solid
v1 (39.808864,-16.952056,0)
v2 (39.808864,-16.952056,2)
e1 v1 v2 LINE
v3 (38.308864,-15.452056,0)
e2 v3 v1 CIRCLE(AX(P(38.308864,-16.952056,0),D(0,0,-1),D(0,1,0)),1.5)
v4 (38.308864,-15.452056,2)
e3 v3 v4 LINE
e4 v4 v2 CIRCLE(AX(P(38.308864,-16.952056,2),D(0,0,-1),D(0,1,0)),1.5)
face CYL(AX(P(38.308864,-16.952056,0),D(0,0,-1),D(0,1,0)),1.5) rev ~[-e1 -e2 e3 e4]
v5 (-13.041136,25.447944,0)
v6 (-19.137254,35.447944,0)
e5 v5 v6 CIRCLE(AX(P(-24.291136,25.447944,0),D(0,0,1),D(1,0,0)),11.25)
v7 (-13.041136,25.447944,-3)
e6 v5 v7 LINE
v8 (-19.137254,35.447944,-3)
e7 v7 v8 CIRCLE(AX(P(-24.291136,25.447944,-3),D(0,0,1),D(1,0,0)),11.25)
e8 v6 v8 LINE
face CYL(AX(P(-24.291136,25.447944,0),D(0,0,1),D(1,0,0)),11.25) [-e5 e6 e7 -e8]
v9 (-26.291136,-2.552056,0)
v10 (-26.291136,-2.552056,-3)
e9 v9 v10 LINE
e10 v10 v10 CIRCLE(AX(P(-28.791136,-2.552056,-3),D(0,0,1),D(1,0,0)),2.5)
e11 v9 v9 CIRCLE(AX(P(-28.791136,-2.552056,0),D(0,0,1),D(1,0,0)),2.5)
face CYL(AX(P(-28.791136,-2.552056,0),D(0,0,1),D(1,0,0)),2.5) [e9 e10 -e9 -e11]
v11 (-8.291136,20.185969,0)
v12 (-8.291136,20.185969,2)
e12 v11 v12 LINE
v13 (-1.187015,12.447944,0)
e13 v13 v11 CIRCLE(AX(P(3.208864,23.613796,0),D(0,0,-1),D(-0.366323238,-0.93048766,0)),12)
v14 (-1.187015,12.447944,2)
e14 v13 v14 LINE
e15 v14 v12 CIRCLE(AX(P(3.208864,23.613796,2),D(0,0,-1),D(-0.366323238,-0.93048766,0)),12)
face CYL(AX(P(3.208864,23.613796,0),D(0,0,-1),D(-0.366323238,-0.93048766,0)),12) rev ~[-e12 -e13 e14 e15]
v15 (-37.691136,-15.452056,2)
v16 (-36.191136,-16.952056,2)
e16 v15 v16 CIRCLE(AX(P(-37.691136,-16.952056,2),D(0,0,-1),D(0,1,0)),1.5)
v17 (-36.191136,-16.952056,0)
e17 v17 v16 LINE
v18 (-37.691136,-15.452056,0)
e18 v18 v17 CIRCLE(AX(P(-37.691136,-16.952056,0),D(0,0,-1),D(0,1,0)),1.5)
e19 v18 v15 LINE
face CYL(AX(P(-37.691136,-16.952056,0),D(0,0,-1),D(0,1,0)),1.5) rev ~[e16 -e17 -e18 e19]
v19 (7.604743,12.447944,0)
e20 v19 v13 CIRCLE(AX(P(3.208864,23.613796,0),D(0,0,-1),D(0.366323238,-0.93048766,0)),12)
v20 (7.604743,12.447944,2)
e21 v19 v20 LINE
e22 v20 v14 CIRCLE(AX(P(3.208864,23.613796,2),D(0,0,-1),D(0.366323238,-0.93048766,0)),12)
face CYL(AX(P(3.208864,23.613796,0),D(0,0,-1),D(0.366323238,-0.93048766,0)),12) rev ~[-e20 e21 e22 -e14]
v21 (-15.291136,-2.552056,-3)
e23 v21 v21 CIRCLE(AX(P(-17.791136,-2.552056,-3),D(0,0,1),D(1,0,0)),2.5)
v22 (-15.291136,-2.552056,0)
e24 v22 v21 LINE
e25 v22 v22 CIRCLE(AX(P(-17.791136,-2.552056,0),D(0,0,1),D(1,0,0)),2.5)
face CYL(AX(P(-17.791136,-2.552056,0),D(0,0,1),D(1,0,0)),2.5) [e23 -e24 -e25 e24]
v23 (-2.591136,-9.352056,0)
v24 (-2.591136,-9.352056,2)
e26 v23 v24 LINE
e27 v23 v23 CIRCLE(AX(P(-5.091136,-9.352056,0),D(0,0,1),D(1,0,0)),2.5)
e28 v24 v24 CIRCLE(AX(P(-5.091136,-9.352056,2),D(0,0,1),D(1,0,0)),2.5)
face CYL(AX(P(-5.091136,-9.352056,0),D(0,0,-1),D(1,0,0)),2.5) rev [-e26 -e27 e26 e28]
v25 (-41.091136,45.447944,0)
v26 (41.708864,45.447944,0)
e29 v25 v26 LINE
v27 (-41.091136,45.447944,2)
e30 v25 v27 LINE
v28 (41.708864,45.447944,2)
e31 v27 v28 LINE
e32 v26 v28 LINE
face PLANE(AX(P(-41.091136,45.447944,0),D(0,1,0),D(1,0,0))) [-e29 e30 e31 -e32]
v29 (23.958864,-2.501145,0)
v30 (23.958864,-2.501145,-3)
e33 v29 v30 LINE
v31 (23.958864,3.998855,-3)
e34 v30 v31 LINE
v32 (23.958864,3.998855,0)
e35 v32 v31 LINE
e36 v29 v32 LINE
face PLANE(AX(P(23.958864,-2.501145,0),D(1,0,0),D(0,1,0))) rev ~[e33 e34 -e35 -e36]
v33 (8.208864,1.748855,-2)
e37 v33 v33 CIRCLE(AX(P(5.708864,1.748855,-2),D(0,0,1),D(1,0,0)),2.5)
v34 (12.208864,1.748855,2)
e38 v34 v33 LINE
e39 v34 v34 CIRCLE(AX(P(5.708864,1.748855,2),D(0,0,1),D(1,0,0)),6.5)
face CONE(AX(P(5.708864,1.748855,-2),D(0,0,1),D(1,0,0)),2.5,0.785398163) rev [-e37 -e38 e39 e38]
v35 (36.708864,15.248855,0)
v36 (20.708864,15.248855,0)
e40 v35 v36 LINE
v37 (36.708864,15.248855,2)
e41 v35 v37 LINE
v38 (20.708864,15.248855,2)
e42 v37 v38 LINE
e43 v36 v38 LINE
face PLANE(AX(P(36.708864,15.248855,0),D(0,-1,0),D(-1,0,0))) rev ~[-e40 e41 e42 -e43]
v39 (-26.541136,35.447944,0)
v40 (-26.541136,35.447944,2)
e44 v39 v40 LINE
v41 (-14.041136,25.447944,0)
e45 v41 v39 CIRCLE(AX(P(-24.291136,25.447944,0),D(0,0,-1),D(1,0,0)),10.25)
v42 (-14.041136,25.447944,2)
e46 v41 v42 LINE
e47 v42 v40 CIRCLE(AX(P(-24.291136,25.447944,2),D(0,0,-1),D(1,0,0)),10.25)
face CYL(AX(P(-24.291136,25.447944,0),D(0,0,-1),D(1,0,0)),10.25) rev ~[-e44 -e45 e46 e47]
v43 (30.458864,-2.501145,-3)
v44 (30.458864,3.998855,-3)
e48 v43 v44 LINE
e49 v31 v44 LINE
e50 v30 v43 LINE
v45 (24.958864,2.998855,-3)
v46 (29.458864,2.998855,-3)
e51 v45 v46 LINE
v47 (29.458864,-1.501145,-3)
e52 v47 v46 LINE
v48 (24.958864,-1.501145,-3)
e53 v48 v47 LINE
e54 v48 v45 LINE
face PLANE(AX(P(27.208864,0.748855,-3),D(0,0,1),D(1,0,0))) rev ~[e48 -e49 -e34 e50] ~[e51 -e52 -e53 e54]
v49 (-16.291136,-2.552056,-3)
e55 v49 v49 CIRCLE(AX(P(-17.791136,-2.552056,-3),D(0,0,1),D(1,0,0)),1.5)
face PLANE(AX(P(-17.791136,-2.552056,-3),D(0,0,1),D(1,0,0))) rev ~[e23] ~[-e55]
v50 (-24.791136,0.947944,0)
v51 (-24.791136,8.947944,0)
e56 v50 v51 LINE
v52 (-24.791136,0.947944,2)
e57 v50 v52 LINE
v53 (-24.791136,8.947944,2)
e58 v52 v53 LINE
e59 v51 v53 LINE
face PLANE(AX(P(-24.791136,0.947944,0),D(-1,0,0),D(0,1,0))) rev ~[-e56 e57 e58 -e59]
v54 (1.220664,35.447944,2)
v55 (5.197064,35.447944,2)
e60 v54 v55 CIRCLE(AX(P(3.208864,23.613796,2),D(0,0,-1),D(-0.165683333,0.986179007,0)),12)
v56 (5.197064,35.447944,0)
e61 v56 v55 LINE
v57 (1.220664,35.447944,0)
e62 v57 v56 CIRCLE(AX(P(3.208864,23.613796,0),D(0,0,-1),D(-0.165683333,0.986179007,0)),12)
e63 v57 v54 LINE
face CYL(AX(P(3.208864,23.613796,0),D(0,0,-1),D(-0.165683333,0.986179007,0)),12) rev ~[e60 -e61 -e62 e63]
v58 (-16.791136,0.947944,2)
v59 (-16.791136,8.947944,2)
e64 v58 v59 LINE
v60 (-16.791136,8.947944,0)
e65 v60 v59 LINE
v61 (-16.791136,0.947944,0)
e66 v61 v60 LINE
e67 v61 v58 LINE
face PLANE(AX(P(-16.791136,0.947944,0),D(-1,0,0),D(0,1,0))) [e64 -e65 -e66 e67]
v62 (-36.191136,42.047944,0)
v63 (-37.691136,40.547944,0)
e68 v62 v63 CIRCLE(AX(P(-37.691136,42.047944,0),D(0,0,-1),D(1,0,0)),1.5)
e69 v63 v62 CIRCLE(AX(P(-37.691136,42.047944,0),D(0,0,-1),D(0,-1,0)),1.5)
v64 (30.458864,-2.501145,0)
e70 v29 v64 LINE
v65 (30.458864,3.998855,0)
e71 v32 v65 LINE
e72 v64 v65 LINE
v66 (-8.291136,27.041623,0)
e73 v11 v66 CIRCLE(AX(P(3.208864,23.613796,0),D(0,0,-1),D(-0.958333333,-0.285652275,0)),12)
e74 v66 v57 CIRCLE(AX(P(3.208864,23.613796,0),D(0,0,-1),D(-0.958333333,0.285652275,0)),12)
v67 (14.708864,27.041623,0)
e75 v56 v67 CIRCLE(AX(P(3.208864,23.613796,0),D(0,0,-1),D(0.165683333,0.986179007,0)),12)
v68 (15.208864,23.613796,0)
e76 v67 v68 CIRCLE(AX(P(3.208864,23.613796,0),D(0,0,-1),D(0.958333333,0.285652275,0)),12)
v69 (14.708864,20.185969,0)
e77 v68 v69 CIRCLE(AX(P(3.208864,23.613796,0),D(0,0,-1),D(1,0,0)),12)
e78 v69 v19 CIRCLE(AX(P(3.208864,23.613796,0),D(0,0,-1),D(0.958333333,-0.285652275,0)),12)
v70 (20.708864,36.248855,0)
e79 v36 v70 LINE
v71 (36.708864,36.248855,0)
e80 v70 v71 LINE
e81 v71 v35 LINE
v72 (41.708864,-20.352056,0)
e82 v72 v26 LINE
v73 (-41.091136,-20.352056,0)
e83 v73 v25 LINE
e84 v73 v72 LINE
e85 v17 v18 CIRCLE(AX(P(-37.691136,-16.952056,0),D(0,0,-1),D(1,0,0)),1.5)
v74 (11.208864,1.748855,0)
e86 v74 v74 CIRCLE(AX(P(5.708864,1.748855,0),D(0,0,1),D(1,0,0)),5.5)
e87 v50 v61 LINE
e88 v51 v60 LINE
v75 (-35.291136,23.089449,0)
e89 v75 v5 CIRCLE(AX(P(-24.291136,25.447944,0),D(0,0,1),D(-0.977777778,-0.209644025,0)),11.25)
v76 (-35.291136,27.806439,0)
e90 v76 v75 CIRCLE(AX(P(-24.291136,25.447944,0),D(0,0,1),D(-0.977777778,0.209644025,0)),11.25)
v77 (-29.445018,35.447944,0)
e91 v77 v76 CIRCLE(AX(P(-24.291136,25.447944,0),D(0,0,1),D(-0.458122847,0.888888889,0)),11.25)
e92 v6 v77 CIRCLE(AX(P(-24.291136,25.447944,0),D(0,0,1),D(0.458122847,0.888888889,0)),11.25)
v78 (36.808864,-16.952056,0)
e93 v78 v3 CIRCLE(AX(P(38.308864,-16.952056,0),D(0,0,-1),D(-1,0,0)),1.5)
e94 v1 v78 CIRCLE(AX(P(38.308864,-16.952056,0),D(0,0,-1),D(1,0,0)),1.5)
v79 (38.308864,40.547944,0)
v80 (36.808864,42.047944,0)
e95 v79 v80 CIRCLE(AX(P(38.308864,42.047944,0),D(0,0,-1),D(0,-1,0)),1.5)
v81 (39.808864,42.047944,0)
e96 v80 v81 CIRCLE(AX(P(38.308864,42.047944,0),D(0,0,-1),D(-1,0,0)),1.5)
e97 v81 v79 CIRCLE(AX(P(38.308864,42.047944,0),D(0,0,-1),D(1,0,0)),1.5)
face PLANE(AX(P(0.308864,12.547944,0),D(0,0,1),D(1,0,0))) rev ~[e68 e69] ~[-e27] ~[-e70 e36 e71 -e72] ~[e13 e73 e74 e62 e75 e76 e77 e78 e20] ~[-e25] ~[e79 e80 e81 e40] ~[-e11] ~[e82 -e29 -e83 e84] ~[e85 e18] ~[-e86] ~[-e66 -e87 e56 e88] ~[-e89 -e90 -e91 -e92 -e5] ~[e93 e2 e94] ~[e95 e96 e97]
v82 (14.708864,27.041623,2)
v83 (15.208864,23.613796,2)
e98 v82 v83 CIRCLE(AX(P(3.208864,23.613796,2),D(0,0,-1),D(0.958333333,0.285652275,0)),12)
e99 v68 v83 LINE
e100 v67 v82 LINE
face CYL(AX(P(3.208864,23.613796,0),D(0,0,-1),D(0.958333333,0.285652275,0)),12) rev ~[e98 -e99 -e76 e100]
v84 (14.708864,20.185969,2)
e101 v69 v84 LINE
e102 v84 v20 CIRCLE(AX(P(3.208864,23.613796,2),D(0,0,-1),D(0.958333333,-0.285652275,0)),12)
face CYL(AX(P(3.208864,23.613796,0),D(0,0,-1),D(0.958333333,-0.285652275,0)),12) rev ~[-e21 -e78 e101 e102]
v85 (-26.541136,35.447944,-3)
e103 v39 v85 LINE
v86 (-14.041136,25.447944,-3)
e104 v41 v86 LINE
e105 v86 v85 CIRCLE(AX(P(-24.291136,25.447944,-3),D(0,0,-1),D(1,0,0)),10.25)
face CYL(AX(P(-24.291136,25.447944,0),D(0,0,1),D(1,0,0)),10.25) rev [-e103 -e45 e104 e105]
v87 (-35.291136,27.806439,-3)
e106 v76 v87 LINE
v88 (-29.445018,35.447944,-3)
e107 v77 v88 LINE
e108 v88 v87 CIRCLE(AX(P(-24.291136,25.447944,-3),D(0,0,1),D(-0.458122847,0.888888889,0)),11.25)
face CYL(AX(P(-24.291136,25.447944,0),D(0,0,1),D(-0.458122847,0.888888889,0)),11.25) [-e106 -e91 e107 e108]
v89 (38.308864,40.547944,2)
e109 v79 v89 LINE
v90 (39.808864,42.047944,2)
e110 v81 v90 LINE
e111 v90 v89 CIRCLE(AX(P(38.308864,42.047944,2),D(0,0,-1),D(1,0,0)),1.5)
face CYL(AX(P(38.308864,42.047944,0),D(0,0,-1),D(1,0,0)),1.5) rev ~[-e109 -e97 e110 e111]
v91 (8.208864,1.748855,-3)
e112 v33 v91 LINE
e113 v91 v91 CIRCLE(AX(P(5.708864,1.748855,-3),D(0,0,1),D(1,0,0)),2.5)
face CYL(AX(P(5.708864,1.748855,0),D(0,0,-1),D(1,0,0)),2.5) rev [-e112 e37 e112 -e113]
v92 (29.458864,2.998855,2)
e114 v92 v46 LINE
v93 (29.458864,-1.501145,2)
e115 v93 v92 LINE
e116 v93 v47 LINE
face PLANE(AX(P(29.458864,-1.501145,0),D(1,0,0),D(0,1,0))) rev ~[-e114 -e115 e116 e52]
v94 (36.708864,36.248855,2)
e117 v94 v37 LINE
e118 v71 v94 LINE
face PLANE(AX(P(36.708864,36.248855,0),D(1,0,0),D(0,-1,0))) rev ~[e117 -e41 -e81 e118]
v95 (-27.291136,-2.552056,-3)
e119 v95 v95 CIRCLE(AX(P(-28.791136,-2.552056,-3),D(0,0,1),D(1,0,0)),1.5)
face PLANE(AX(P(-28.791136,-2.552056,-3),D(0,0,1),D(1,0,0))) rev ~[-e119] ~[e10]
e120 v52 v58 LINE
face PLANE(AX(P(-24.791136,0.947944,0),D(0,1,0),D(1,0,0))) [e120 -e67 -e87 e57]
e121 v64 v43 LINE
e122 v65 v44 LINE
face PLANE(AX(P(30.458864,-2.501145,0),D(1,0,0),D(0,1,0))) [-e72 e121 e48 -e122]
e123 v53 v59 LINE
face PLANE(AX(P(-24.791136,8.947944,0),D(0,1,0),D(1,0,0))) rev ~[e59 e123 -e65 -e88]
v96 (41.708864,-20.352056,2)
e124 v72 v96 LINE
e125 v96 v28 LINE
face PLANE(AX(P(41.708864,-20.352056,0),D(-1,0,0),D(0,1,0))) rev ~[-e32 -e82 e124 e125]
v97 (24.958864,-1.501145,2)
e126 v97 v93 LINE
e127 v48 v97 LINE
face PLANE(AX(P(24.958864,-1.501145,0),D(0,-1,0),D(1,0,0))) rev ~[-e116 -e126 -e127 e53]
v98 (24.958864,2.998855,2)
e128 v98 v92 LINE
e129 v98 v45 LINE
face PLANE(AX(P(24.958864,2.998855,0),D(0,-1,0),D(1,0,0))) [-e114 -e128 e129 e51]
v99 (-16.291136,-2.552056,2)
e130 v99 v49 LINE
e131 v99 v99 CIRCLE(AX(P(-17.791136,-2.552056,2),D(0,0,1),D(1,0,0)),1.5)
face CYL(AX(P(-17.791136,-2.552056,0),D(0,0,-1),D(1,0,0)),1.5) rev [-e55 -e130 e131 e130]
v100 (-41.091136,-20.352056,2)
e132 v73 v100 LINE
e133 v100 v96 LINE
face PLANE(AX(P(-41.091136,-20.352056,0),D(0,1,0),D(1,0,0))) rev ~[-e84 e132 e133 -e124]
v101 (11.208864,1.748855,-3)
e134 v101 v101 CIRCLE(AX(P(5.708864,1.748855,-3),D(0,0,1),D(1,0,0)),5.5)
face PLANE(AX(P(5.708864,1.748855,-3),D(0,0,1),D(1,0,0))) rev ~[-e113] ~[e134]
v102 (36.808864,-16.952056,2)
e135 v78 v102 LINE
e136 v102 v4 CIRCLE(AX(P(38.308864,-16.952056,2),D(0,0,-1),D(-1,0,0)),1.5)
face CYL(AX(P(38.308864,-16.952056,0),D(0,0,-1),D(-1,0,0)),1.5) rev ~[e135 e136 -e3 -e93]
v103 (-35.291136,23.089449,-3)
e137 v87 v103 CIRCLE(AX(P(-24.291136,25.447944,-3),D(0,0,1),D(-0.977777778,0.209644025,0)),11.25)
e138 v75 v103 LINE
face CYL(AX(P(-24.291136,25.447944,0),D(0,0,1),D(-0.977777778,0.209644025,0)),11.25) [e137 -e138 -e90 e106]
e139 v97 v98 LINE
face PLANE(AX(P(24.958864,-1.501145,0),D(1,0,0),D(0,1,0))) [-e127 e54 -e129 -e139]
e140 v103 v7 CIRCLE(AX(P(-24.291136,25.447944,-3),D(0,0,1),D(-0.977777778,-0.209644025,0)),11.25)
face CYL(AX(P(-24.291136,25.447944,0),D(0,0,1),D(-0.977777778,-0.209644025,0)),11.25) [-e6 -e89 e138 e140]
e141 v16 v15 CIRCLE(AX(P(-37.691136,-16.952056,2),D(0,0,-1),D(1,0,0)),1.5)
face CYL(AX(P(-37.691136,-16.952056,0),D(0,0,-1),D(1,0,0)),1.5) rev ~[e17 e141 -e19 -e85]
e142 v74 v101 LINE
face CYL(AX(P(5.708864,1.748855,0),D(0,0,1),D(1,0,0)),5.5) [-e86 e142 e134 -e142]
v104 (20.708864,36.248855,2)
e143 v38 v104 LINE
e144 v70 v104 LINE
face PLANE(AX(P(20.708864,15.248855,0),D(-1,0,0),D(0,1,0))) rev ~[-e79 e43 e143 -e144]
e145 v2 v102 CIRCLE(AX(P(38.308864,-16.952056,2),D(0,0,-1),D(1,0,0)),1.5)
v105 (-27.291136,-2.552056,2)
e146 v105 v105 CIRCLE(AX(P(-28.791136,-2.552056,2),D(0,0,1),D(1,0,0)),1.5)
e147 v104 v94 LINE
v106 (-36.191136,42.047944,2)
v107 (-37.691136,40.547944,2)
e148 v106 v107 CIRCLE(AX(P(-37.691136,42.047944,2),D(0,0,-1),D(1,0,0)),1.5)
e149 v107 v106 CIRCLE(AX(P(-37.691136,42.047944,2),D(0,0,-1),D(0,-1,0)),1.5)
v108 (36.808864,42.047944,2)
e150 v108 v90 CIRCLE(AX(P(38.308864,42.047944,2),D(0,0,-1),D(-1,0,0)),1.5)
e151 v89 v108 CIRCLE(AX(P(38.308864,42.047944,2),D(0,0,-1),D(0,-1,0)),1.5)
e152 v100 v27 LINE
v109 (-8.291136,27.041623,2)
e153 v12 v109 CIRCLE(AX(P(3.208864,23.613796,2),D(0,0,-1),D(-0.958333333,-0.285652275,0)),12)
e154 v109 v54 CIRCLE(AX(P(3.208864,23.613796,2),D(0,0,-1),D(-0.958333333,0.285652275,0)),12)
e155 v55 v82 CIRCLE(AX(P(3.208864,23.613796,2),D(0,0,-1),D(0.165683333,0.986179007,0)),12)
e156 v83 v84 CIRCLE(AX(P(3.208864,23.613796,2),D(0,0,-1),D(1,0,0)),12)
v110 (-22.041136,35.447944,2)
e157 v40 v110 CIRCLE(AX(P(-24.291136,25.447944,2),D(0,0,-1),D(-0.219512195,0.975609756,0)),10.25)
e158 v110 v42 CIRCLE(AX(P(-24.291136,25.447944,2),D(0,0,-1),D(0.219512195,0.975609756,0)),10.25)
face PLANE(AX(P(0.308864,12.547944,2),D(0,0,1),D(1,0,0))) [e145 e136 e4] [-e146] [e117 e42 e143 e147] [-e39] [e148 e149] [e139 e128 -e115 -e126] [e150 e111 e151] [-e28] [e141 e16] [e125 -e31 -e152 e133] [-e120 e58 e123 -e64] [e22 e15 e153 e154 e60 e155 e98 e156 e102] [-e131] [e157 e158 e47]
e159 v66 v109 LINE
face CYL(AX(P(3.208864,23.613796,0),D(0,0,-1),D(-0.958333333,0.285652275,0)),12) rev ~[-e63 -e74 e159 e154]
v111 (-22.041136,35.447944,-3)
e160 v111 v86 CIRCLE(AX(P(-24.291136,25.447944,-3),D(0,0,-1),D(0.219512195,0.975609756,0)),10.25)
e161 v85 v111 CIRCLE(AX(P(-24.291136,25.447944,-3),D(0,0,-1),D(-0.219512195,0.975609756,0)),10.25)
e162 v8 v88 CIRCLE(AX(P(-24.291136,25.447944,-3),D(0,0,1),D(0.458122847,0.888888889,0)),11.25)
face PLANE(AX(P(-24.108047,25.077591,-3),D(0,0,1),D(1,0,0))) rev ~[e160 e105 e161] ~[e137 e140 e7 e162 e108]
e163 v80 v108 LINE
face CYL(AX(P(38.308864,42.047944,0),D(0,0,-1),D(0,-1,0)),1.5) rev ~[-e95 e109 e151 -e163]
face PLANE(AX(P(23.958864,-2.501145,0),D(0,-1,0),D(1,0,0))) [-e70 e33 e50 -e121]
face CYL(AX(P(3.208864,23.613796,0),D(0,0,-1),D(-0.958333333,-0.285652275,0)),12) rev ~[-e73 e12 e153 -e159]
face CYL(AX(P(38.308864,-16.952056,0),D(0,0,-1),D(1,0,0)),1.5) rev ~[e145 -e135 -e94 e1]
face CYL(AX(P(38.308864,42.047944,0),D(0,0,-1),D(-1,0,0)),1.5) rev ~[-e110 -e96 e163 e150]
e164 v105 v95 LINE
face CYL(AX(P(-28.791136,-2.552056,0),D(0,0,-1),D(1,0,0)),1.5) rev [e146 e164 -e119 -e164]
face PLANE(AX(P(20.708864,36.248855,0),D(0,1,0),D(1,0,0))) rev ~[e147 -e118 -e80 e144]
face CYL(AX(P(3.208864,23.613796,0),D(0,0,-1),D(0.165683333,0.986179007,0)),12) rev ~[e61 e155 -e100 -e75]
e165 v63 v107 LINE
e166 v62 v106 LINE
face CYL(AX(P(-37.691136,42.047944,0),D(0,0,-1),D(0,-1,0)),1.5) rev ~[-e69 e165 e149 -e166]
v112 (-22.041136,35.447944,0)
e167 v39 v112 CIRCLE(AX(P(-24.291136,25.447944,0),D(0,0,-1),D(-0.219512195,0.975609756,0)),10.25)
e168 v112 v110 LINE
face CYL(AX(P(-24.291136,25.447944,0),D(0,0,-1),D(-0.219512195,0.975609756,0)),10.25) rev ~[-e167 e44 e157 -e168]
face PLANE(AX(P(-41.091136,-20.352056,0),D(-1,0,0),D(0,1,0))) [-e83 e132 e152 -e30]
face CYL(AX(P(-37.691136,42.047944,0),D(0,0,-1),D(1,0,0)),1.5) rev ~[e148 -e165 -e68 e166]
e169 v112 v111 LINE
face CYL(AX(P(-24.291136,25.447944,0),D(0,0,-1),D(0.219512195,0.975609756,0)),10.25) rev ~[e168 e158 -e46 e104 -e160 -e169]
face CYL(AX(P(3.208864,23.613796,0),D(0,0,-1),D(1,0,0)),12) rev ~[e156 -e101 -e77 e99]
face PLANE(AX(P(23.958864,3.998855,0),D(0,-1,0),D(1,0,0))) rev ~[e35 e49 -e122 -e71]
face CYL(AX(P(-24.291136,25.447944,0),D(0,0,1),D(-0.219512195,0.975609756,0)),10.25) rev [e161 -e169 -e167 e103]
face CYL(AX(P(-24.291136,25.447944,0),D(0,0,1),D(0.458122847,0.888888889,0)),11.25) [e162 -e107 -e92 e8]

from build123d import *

# Parameters (mm, degrees)
F0_W     = 82.8
F0_H     = 65.8
F0_R     = 2.5
F0_W_2   = 8
F0_H_2   = 8
F0_R_2   = 5.5
F0_W_3   = 6.5
F0_H_3   = 6.5
F0_W_4   = 4.5
F0_H_4   = 4.5
F0_R_3   = 1.5
F1_DEPTH = 2
F2_DEPTH = 3
F3_SIZE  = 4


# Not quite as in the source:
# - a feature names something its author has since deleted; it is built from what else it names


with BuildPart() as f1:
    # F0 (on Top) → F1 (new body)
    with BuildSketch(Plane.XY):
        with Locations((0.3088639305, 12.5479439557)):
            Rectangle(F0_W, F0_H)
        with BuildLine():
            ThreePointArc((-37.6911360695, 40.5479439557), (-38.7517962413, 43.1086041274), (-36.1911360695, 42.0479439557))
            Line((-36.1911360695, 42.0479439557), (36.8088639305, 42.0479439557))
            ThreePointArc((36.8088639305, 42.0479439557), (38.3088639305, 43.5479439557), (39.8088639305, 42.0479439557))
            ThreePointArc((39.8088639305, 42.0479439557), (39.3695241023, 40.9872837839), (38.3088639305, 40.5479439557))
            Line((38.3088639305, 40.5479439557), (38.3088639305, -15.4520560443))
            ThreePointArc((38.3088639305, -15.4520560443), (39.3695241023, -15.8913958726), (39.8088639305, -16.9520560443))
            ThreePointArc((39.8088639305, -16.9520560443), (38.3088639305, -18.4520560443), (36.8088639305, -16.9520560443))
            Line((36.8088639305, -16.9520560443), (-36.1911360695, -16.9520560443))
            ThreePointArc((-36.1911360695, -16.9520560443), (-38.7517962413, -18.0127162161), (-37.6911360695, -15.4520560443))
            Line((-37.6911360695, -15.4520560443), (-37.6911360695, 40.5479439557))
        make_face(mode=Mode.SUBTRACT)
        with BuildLine():
            Line((36.8088639305, 42.0479439557), (-36.1911360695, 42.0479439557))
            ThreePointArc((-36.1911360695, 42.0479439557), (-36.6304758977, 40.9872837839), (-37.6911360695, 40.5479439557))
            Line((-37.6911360695, 40.5479439557), (-37.6911360695, -15.4520560443))
            ThreePointArc((-37.6911360695, -15.4520560443), (-36.6304758977, -15.8913958726), (-36.1911360695, -16.9520560443))
            Line((-36.1911360695, -16.9520560443), (36.8088639305, -16.9520560443))
            ThreePointArc((36.8088639305, -16.9520560443), (37.2482037587, -15.8913958726), (38.3088639305, -15.4520560443))
            Line((38.3088639305, -15.4520560443), (38.3088639305, 40.5479439557))
            ThreePointArc((38.3088639305, 40.5479439557), (37.2482037587, 40.9872837839), (36.8088639305, 42.0479439557))
        make_face()
        with BuildLine():
            Line((-35.2911360695, 27.8064392387), (-35.2911360695, 35.4479439557))
            Line((-35.2911360695, 35.4479439557), (-29.4450181015, 35.4479439557))
            ThreePointArc((-29.4450181015, 35.4479439557), (-24.2911360695, 36.6979439557), (-19.1372540375, 35.4479439557))
            Line((-19.1372540375, 35.4479439557), (-8.2911360695, 35.4479439557))
            Line((-8.2911360695, 35.4479439557), (1.2206639384, 35.4479439557))
            ThreePointArc((1.2206639384, 35.4479439557), (3.2088639305, 35.6137958751), (5.1970639225, 35.4479439557))
            Line((5.1970639225, 35.4479439557), (14.7088639305, 35.4479439557))
            Line((14.7088639305, 35.4479439557), (20.7088639305, 35.4479439557))
            Line((20.7088639305, 35.4479439557), (20.7088639305, 36.2488545371))
            Line((20.7088639305, 36.2488545371), (36.7088639305, 36.2488545371))
            Line((36.7088639305, 36.2488545371), (36.7088639305, 15.2488545371))
            Line((36.7088639305, 15.2488545371), (34.7088639305, 15.2488545371))
            Line((34.7088639305, 15.2488545371), (34.7088639305, -14.2511454629))
            Line((34.7088639305, -14.2511454629), (-35.2911360695, -14.5520560443))
            Line((-35.2911360695, -14.5520560443), (-35.2911360695, 23.0894486726))
            ThreePointArc((-35.2911360695, 23.0894486726), (-35.5411360695, 25.4479439557), (-35.2911360695, 27.8064392387))
        make_face(mode=Mode.SUBTRACT)
        with BuildLine():
            Line((-8.2911360695, 35.4479439557), (-19.1372540375, 35.4479439557))
            ThreePointArc((-19.1372540375, 35.4479439557), (-14.6853130215, 31.3037670037), (-13.0411360695, 25.4479439557))
            ThreePointArc((-13.0411360695, 25.4479439557), (-23.105281947, 14.260618538), (-35.2911360695, 23.0894486726))
            Line((-35.2911360695, 23.0894486726), (-35.2911360695, -14.5520560443))
            Line((-35.2911360695, -14.5520560443), (34.7088639305, -14.2511454629))
            Line((34.7088639305, -14.2511454629), (34.7088639305, 15.2488545371))
            Line((34.7088639305, 15.2488545371), (20.7088639305, 15.2488545371))
            Line((20.7088639305, 15.2488545371), (20.7088639305, 35.4479439557))
            Line((20.7088639305, 35.4479439557), (14.7088639305, 35.4479439557))
            Line((14.7088639305, 35.4479439557), (14.7088639305, 27.0416231753))
            ThreePointArc((14.7088639305, 27.0416231753), (15.0832060175, 25.3458466827), (15.2088639305, 23.6137958751))
            ThreePointArc((15.2088639305, 23.6137958751), (15.0832060175, 21.8817450676), (14.7088639305, 20.1859685749))
            Line((14.7088639305, 20.1859685749), (14.7088639305, 12.4479439557))
            Line((14.7088639305, 12.4479439557), (7.604742786, 12.4479439557))
            ThreePointArc((7.604742786, 12.4479439557), (3.2088639305, 11.6137958751), (-1.187014925, 12.4479439557))
            Line((-1.187014925, 12.4479439557), (-8.2911360695, 12.4479439557))
            Line((-8.2911360695, 12.4479439557), (-8.2911360695, 20.1859685749))
            ThreePointArc((-8.2911360695, 20.1859685749), (-8.7911360695, 23.6137958751), (-8.2911360695, 27.0416231753))
            Line((-8.2911360695, 27.0416231753), (-8.2911360695, 35.4479439557))
        make_face()
        with Locations((-5.0911360695, -9.3520560443)):
            Circle(F0_R, mode=Mode.SUBTRACT)
        with Locations((-28.7911360695, -2.5520560443)):
            Circle(F0_R, mode=Mode.SUBTRACT)
        with Locations((-20.7911360695, 4.9479439557)):
            Rectangle(F0_W_2, F0_H_2, mode=Mode.SUBTRACT)
        with Locations((-17.7911360695, -2.5520560443)):
            Circle(F0_R, mode=Mode.SUBTRACT)
        with Locations((5.7088639305, 1.7488545371)):
            Circle(F0_R_2, mode=Mode.SUBTRACT)
        with Locations((27.2088639305, 0.7488545371)):
            Rectangle(F0_W_3, F0_H_3, mode=Mode.SUBTRACT)
        with Locations((5.7088639305, 1.7488545371)):
            Circle(F0_R_2)
        with Locations((5.7088639305, 1.7488545371)):
            Circle(F0_R, mode=Mode.SUBTRACT)
        with BuildLine():
            Line((-26.5411360695, 35.4479439557), (-29.4450181015, 35.4479439557))
            ThreePointArc((-29.4450181015, 35.4479439557), (-33.2261864197, 32.2836864346), (-35.2911360695, 27.8064392387))
            Line((-35.2911360695, 27.8064392387), (-35.2911360695, 23.0894486726))
            ThreePointArc((-35.2911360695, 23.0894486726), (-23.105281947, 14.260618538), (-13.0411360695, 25.4479439557))
            ThreePointArc((-13.0411360695, 25.4479439557), (-14.6853130215, 31.3037670037), (-19.1372540375, 35.4479439557))
            Line((-19.1372540375, 35.4479439557), (-22.0411360695, 35.4479439557))
            ThreePointArc((-22.0411360695, 35.4479439557), (-16.2872307727, 31.8510681931), (-14.0411360695, 25.4479439557))
            ThreePointArc((-14.0411360695, 25.4479439557), (-30.694260307, 17.4440386589), (-26.5411360695, 35.4479439557))
        make_face()
        with Locations((27.2088639305, 0.7488545371)):
            Rectangle(F0_W_3, F0_H_3)
        with Locations((27.2088639305, 0.7488545371)):
            Rectangle(F0_W_4, F0_H_4, mode=Mode.SUBTRACT)
        with BuildLine():
            Line((1.2206639384, 35.4479439557), (-8.2911360695, 35.4479439557))
            Line((-8.2911360695, 35.4479439557), (-8.2911360695, 27.0416231753))
            ThreePointArc((-8.2911360695, 27.0416231753), (-4.7377983891, 32.6054897077), (1.2206639384, 35.4479439557))
        make_face()
        with BuildLine():
            Line((14.7088639305, 35.4479439557), (5.1970639225, 35.4479439557))
            ThreePointArc((5.1970639225, 35.4479439557), (11.1555262501, 32.6054897077), (14.7088639305, 27.0416231753))
            Line((14.7088639305, 27.0416231753), (14.7088639305, 35.4479439557))
        make_face()
        with Locations((-17.7911360695, -2.5520560443)):
            Circle(F0_R)
        with Locations((-17.7911360695, -2.5520560443)):
            Circle(F0_R_3, mode=Mode.SUBTRACT)
        with Locations((-28.7911360695, -2.5520560443)):
            Circle(F0_R)
        with Locations((-28.7911360695, -2.5520560443)):
            Circle(F0_R_3, mode=Mode.SUBTRACT)
        with BuildLine():
            ThreePointArc((-1.187014925, 12.4479439557), (-5.6307626114, 15.4983166779), (-8.2911360695, 20.1859685749))
            Line((-8.2911360695, 20.1859685749), (-8.2911360695, 12.4479439557))
            Line((-8.2911360695, 12.4479439557), (-1.187014925, 12.4479439557))
        make_face()
        with BuildLine():
            Line((14.7088639305, 12.4479439557), (14.7088639305, 20.1859685749))
            ThreePointArc((14.7088639305, 20.1859685749), (12.0484904723, 15.4983166779), (7.604742786, 12.4479439557))
            Line((7.604742786, 12.4479439557), (14.7088639305, 12.4479439557))
        make_face()
        with BuildLine():
            Line((-29.4450181015, 35.4479439557), (-35.2911360695, 35.4479439557))
            Line((-35.2911360695, 35.4479439557), (-35.2911360695, 27.8064392387))
            ThreePointArc((-35.2911360695, 27.8064392387), (-33.2261864197, 32.2836864346), (-29.4450181015, 35.4479439557))
        make_face()
        with BuildLine():
            ThreePointArc((-19.1372540375, 35.4479439557), (-24.2911360695, 36.6979439557), (-29.4450181015, 35.4479439557))
            Line((-29.4450181015, 35.4479439557), (-26.5411360695, 35.4479439557))
            ThreePointArc((-26.5411360695, 35.4479439557), (-24.2911360695, 35.6979439557), (-22.0411360695, 35.4479439557))
            Line((-22.0411360695, 35.4479439557), (-19.1372540375, 35.4479439557))
        make_face()
        with BuildLine():
            Line((-35.2911360695, 23.0894486726), (-35.2911360695, 27.8064392387))
            ThreePointArc((-35.2911360695, 27.8064392387), (-35.5411360695, 25.4479439557), (-35.2911360695, 23.0894486726))
        make_face()
    extrude(amount=F1_DEPTH)

    # F0 (on Top) → F2 (join)
    with BuildSketch(Plane.XY):
        with Locations((27.2088639305, 0.7488545371)):
            Rectangle(F0_W_3, F0_H_3)
        with Locations((27.2088639305, 0.7488545371)):
            Rectangle(F0_W_4, F0_H_4, mode=Mode.SUBTRACT)
        with BuildLine():
            Line((-26.5411360695, 35.4479439557), (-29.4450181015, 35.4479439557))
            ThreePointArc((-29.4450181015, 35.4479439557), (-33.2261864197, 32.2836864346), (-35.2911360695, 27.8064392387))
            Line((-35.2911360695, 27.8064392387), (-35.2911360695, 23.0894486726))
            ThreePointArc((-35.2911360695, 23.0894486726), (-23.105281947, 14.260618538), (-13.0411360695, 25.4479439557))
            ThreePointArc((-13.0411360695, 25.4479439557), (-14.6853130215, 31.3037670037), (-19.1372540375, 35.4479439557))
            Line((-19.1372540375, 35.4479439557), (-22.0411360695, 35.4479439557))
            ThreePointArc((-22.0411360695, 35.4479439557), (-16.2872307727, 31.8510681931), (-14.0411360695, 25.4479439557))
            ThreePointArc((-14.0411360695, 25.4479439557), (-30.694260307, 17.4440386589), (-26.5411360695, 35.4479439557))
        make_face()
        with Locations((-17.7911360695, -2.5520560443)):
            Circle(F0_R)
        with Locations((-17.7911360695, -2.5520560443)):
            Circle(F0_R_3, mode=Mode.SUBTRACT)
        with Locations((5.7088639305, 1.7488545371)):
            Circle(F0_R_2)
        with Locations((5.7088639305, 1.7488545371)):
            Circle(F0_R, mode=Mode.SUBTRACT)
        with BuildLine():
            ThreePointArc((-19.1372540375, 35.4479439557), (-24.2911360695, 36.6979439557), (-29.4450181015, 35.4479439557))
            Line((-29.4450181015, 35.4479439557), (-26.5411360695, 35.4479439557))
            ThreePointArc((-26.5411360695, 35.4479439557), (-24.2911360695, 35.6979439557), (-22.0411360695, 35.4479439557))
            Line((-22.0411360695, 35.4479439557), (-19.1372540375, 35.4479439557))
        make_face()
        with Locations((-28.7911360695, -2.5520560443)):
            Circle(F0_R)
        with Locations((-28.7911360695, -2.5520560443)):
            Circle(F0_R_3, mode=Mode.SUBTRACT)
        with BuildLine():
            Line((-35.2911360695, 23.0894486726), (-35.2911360695, 27.8064392387))
            ThreePointArc((-35.2911360695, 27.8064392387), (-35.5411360695, 25.4479439557), (-35.2911360695, 23.0894486726))
        make_face()
    extrude(amount=-F2_DEPTH)

    # F3
    f3_edges = [f1.edges().sort_by_distance(p)[0] for p in [
        (3.208864, 1.748855, 2),
    ]]
    chamfer(f3_edges, length=F3_SIZE)


solid = f1.part
